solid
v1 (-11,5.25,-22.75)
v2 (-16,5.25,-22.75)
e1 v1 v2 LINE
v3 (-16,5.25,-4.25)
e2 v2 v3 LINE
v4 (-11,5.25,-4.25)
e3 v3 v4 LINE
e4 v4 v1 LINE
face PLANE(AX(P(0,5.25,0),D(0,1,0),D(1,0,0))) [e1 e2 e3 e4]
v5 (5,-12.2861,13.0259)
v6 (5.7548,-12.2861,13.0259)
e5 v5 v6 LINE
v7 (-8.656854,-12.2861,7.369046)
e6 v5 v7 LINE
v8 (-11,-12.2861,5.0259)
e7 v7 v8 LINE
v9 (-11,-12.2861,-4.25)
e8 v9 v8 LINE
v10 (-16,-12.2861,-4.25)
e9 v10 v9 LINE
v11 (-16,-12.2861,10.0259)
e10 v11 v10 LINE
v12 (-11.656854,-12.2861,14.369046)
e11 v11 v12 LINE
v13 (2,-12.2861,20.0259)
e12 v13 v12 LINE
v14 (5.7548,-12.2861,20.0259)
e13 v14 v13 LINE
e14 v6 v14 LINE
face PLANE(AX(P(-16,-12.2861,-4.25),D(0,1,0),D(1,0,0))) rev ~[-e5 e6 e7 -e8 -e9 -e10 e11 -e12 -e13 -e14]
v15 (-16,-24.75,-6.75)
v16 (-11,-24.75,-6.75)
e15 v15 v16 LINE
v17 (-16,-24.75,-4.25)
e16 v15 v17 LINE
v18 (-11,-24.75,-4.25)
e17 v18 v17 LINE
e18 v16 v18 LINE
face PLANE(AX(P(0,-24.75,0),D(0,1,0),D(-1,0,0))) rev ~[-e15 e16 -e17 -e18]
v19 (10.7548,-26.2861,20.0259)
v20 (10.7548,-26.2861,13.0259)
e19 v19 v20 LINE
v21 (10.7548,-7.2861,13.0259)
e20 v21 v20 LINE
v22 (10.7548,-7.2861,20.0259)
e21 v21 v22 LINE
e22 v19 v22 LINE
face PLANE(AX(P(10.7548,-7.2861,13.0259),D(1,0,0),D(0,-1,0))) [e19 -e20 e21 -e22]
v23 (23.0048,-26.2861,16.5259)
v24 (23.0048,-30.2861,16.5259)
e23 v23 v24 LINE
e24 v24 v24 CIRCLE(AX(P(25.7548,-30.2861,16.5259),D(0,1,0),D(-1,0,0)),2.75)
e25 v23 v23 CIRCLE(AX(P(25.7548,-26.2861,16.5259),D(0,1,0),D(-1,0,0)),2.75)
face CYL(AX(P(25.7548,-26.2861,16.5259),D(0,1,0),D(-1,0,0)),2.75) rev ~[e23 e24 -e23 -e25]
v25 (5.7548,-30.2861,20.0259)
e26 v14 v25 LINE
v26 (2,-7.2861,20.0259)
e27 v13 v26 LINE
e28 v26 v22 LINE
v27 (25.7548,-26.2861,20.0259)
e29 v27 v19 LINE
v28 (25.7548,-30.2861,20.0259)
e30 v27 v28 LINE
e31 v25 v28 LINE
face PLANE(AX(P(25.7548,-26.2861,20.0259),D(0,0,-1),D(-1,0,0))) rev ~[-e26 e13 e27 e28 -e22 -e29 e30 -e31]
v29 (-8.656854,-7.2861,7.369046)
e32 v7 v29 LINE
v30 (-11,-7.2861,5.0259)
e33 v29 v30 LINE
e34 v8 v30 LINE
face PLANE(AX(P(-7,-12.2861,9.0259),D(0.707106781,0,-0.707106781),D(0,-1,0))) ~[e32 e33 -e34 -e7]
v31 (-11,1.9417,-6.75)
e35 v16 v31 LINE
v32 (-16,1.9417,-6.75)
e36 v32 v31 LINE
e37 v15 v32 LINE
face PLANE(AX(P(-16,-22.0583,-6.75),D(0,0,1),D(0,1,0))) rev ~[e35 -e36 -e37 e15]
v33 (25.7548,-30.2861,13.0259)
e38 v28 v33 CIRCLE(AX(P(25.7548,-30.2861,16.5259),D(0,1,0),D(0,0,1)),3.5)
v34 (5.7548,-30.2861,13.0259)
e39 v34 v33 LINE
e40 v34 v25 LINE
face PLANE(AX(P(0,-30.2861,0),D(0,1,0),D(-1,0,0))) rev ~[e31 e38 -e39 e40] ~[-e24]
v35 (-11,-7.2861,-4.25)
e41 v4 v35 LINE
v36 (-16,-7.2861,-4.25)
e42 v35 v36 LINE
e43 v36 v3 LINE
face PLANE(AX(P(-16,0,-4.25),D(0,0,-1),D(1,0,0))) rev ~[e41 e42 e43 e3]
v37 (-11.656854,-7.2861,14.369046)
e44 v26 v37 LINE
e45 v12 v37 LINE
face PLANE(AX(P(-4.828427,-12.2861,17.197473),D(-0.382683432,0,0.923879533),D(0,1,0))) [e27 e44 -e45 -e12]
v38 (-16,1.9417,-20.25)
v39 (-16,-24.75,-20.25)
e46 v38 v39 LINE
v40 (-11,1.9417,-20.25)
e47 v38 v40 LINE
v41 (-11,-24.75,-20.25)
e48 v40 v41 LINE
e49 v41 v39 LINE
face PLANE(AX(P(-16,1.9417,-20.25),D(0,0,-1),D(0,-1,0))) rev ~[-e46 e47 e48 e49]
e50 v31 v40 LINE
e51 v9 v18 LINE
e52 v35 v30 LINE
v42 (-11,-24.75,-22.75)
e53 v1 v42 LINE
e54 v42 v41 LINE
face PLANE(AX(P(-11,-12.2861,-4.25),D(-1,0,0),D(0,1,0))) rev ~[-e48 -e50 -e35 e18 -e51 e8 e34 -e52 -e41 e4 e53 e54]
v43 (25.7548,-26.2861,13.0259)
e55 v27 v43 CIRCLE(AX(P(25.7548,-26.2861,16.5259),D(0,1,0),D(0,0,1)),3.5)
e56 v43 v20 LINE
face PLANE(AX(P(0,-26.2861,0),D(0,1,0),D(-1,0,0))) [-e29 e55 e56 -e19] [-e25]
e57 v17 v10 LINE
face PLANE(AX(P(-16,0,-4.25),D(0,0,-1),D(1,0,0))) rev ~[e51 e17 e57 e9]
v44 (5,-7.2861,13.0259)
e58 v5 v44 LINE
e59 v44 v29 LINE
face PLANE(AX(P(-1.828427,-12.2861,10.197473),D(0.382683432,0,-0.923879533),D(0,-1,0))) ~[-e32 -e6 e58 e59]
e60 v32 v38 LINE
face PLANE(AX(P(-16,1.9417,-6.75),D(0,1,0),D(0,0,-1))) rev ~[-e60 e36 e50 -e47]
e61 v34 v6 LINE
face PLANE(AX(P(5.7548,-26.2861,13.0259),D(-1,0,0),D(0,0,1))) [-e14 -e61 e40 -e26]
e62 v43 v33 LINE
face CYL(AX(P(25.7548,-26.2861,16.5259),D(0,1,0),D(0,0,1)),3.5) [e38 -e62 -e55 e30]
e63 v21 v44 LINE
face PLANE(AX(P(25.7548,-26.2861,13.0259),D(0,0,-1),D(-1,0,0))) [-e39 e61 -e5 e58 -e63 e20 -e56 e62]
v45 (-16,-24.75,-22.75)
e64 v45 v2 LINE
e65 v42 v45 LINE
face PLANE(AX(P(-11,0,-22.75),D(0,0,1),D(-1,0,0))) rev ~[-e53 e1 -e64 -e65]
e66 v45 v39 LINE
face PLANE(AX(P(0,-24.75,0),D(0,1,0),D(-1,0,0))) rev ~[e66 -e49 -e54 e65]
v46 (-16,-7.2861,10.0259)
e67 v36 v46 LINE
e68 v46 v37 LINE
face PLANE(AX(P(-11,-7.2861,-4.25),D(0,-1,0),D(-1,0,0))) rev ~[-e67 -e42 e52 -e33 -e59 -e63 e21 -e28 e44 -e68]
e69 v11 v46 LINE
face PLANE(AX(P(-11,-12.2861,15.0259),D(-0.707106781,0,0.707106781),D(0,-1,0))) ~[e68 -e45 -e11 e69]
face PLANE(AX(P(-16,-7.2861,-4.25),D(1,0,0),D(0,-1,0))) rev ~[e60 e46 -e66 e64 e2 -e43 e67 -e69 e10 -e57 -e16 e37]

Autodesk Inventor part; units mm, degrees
ref_plane "YZ Plane" through (0, 0, 0) normal (1, 0, 0) x (0, 1, 0)
ref_plane "XZ Plane" through (0, 0, 0) normal (0, 1, 0) x (-1, 0, 0)
ref_plane "Work Plane7" through (19.7548, -26.2861, 10.5259) normal (0, -1, 0) x (1, 0, 0)
sketch "Sketch10" plane through (0, 0, 0) normal (0, 1, 0) x (-1, 0, 0)
  line L0 (-27.0112, 18.5709) -> (-26.4391, 18.8263) projected
  line L1 (-25.8204, 18.925) -> (-26.4391, 18.8263) projected
  line L2 (-25.1972, 18.8603) -> (-25.8204, 18.925) projected
  line L3 (-24.6121, 18.6364) -> (-25.1972, 18.8603) projected
  line L4 (-24.1048, 18.2687) -> (-24.6121, 18.6364) projected
  line L5 (-23.7099, 17.7823) -> (-24.1048, 18.2687) projected
  line L6 (-23.4545, 17.2102) -> (-23.7099, 17.7823) projected
  line L7 (-23.4545, 17.2102) -> (-23.3557, 16.5915) projected
  line L8 (-23.4205, 15.9683) -> (-23.3557, 16.5915) projected
  line L9 (-23.4205, 15.9683) -> (-23.6444, 15.3832) projected
  line L10 (-23.6444, 15.3832) -> (-24.0121, 14.8759) projected
  line L11 (-24.0121, 14.8759) -> (-24.4985, 14.481) projected
  line L12 (-24.4985, 14.481) -> (-25.0706, 14.2256) projected
  line L13 (-25.0706, 14.2256) -> (-25.6893, 14.1268) projected
  line L14 (-25.6893, 14.1268) -> (-26.3125, 14.1916) projected
  line L15 (-26.3125, 14.1916) -> (-26.8976, 14.4155) projected
  line L16 (-26.8976, 14.4155) -> (-27.4049, 14.7832) projected
  line L17 (-27.4049, 14.7832) -> (-27.7998, 15.2696) projected
  line L18 (-28.0552, 15.8417) -> (-27.7998, 15.2696) projected
  line L19 (-28.0552, 15.8417) -> (-28.1539, 16.4604) projected
  line L20 (-28.1539, 16.4604) -> (-28.0892, 17.0836) projected
  line L21 (-28.0892, 17.0836) -> (-27.8653, 17.6687) projected
  line L22 (-27.8653, 17.6687) -> (-27.4976, 18.176) projected
  line L23 (-27.0112, 18.5709) -> (-27.4976, 18.176) projected
  line L24 (-26.7545, 16.4986) -> (-26.7275, 16.7583) projected
  line L25 (-26.7133, 16.2408) -> (-26.7545, 16.4986) projected
  line L26 (-26.6069, 16.0025) -> (-26.7133, 16.2408) projected
  line L27 (-26.4424, 15.7998) -> (-26.6069, 16.0025) projected
  line L28 (-26.231, 15.6466) -> (-26.4424, 15.7998) projected
  line L29 (-25.9872, 15.5533) -> (-26.231, 15.6466) projected
  line L30 (-25.7275, 15.5263) -> (-25.9872, 15.5533) projected
  line L31 (-25.4697, 15.5675) -> (-25.7275, 15.5263) projected
  line L32 (-25.2314, 15.6739) -> (-25.4697, 15.5675) projected
  line L33 (-25.0287, 15.8384) -> (-25.2314, 15.6739) projected
  line L34 (-24.8755, 16.0498) -> (-25.0287, 15.8384) projected
  line L35 (-24.7822, 16.2936) -> (-24.8755, 16.0498) projected
  line L36 (-24.7552, 16.5533) -> (-24.7822, 16.2936) projected
  line L37 (-24.7552, 16.5533) -> (-24.7963, 16.8111) projected
  line L38 (-24.7963, 16.8111) -> (-24.9028, 17.0494) projected
  line L39 (-24.9028, 17.0494) -> (-25.0673, 17.2521) projected
  line L40 (-25.0673, 17.2521) -> (-25.2787, 17.4053) projected
  line L41 (-25.2787, 17.4053) -> (-25.5225, 17.4986) projected
  line L42 (-25.5225, 17.4986) -> (-25.7822, 17.5256) projected
  line L43 (-25.7822, 17.5256) -> (-26.04, 17.4844) projected
  line L44 (-26.04, 17.4844) -> (-26.2783, 17.378) projected
  line L45 (-26.2783, 17.378) -> (-26.481, 17.2135) projected
  line L46 (-26.481, 17.2135) -> (-26.6342, 17.0021) projected
  line L47 (-26.6342, 17.0021) -> (-26.7275, 16.7583) projected
  line L48 (-27.0112, 18.5709) -> (-26.4391, 18.8263) projected
  line L49 (-25.8204, 18.925) -> (-26.4391, 18.8263) projected
  line L50 (-25.1972, 18.8603) -> (-25.8204, 18.925) projected
  line L51 (-24.6121, 18.6364) -> (-25.1972, 18.8603) projected
  line L52 (-24.1048, 18.2687) -> (-24.6121, 18.6364) projected
  line L53 (-23.7099, 17.7823) -> (-24.1048, 18.2687) projected
  line L54 (-23.4545, 17.2102) -> (-23.7099, 17.7823) projected
  line L55 (-23.4545, 17.2102) -> (-23.3557, 16.5915) projected
  line L56 (-23.4205, 15.9683) -> (-23.3557, 16.5915) projected
  line L57 (-23.4205, 15.9683) -> (-23.6444, 15.3832) projected
  line L58 (-23.6444, 15.3832) -> (-24.0121, 14.8759) projected
  line L59 (-24.0121, 14.8759) -> (-24.4985, 14.481) projected
  line L60 (-24.4985, 14.481) -> (-25.0706, 14.2256) projected
  line L61 (-25.0706, 14.2256) -> (-25.6893, 14.1268) projected
  line L62 (-25.6893, 14.1268) -> (-26.3125, 14.1916) projected
  line L63 (-26.3125, 14.1916) -> (-26.8976, 14.4155) projected
  line L64 (-26.8976, 14.4155) -> (-27.4049, 14.7832) projected
  line L65 (-27.4049, 14.7832) -> (-27.7998, 15.2696) projected
  line L66 (-28.0552, 15.8417) -> (-27.7998, 15.2696) projected
  line L67 (-28.0552, 15.8417) -> (-28.1539, 16.4604) projected
  line L68 (-28.1539, 16.4604) -> (-28.0892, 17.0836) projected
  line L69 (-28.0892, 17.0836) -> (-27.8653, 17.6687) projected
  line L70 (-27.8653, 17.6687) -> (-27.4976, 18.176) projected
  line L71 (-27.0112, 18.5709) -> (-27.4976, 18.176) projected
  line L72 (-26.7545, 16.4986) -> (-26.7275, 16.7583) projected
  line L73 (-26.7133, 16.2408) -> (-26.7545, 16.4986) projected
  line L74 (-26.6069, 16.0025) -> (-26.7133, 16.2408) projected
  line L75 (-26.4424, 15.7998) -> (-26.6069, 16.0025) projected
  line L76 (-26.231, 15.6466) -> (-26.4424, 15.7998) projected
  line L77 (-25.9872, 15.5533) -> (-26.231, 15.6466) projected
  line L78 (-25.7275, 15.5263) -> (-25.9872, 15.5533) projected
  line L79 (-25.4697, 15.5675) -> (-25.7275, 15.5263) projected
  line L80 (-25.2314, 15.6739) -> (-25.4697, 15.5675) projected
  line L81 (-25.0287, 15.8384) -> (-25.2314, 15.6739) projected
  line L82 (-24.8755, 16.0498) -> (-25.0287, 15.8384) projected
  line L83 (-24.7822, 16.2936) -> (-24.8755, 16.0498) projected
  line L84 (-24.7552, 16.5533) -> (-24.7822, 16.2936) projected
  line L85 (-24.7552, 16.5533) -> (-24.7963, 16.8111) projected
  line L86 (-24.7963, 16.8111) -> (-24.9028, 17.0494) projected
  line L87 (-24.9028, 17.0494) -> (-25.0673, 17.2521) projected
  line L88 (-25.0673, 17.2521) -> (-25.2787, 17.4053) projected
  line L89 (-25.2787, 17.4053) -> (-25.5225, 17.4986) projected
  line L90 (-25.5225, 17.4986) -> (-25.7822, 17.5256) projected
  line L91 (-25.7822, 17.5256) -> (-26.04, 17.4844) projected
  line L92 (-26.04, 17.4844) -> (-26.2783, 17.378) projected
  line L93 (-26.2783, 17.378) -> (-26.481, 17.2135) projected
  line L94 (-26.481, 17.2135) -> (-26.6342, 17.0021) projected
  line L95 (-26.6342, 17.0021) -> (-26.7275, 16.7583) projected
  circle A0 centre (-25.7548, 16.5259) radius 2.75
  arc A1 (-25.7548, 20.0259) -> (-25.7548, 13.0259) centre (-25.7548, 16.5259) ccw
  line L96 (-25.7548, 20.0259) -> (-5.7548, 20.0259) construction
  line L97 (-25.7548, 13.0259) -> (-5.7548, 13.0259)
  line L98 (-5.7548, 13.0259) -> (-5.7548, 20.0259)
  line L99 (-25.7548, 20.0259) -> (-5.7548, 20.0259)
  point P0 (0, 0)
  dimension "d36" = 5.5
  dimension "d37" = 7
  dimension "d40" = 20
extrude "Extrusion8" add sketch "Sketch10" against normal blind 4 from surface at -26.2861 contours L99 L98 L97 A1
sketch "Sketch12" plane through (0, 0, 0) normal (0, 1, 0) x (-1, 0, 0)
  line L0 (26.2, -19.75) -> (26.2, -7.25) projected
  line L1 (26.2, -19.75) -> (11, -19.75) projected
  line L2 (11, -7.25) -> (11, -19.75) projected
  line L3 (11, -7.25) -> (26.2, -7.25) projected
  line L4 (22.4706, -11.917) -> (22.6, -11.9) projected
  line L5 (22.35, -11.967) -> (22.4706, -11.917) projected
  line L6 (22.2464, -12.0464) -> (22.35, -11.967) projected
  line L7 (22.167, -12.15) -> (22.2464, -12.0464) projected
  line L8 (22.117, -12.2706) -> (22.167, -12.15) projected
  line L9 (22.1, -12.4) -> (22.117, -12.2706) projected
  line L10 (22.117, -12.5294) -> (22.1, -12.4) projected
  line L11 (22.167, -12.65) -> (22.117, -12.5294) projected
  line L12 (22.2464, -12.7536) -> (22.167, -12.65) projected
  line L13 (22.35, -12.833) -> (22.2464, -12.7536) projected
  line L14 (22.35, -12.833) -> (22.4706, -12.883) projected
  line L15 (22.4706, -12.883) -> (22.6, -12.9) projected
  line L16 (22.6, -12.9) -> (22.7294, -12.883) projected
  line L17 (22.85, -12.833) -> (22.7294, -12.883) projected
  line L18 (22.9536, -12.7536) -> (22.85, -12.833) projected
  line L19 (23.033, -12.65) -> (22.9536, -12.7536) projected
  line L20 (23.033, -12.65) -> (23.083, -12.5294) projected
  line L21 (23.083, -12.5294) -> (23.1, -12.4) projected
  line L22 (23.1, -12.4) -> (23.083, -12.2706) projected
  line L23 (23.083, -12.2706) -> (23.033, -12.15) projected
  line L24 (23.033, -12.15) -> (22.9536, -12.0464) projected
  line L25 (22.9536, -12.0464) -> (22.85, -11.967) projected
  line L26 (22.85, -11.967) -> (22.7294, -11.917) projected
  line L27 (22.6, -11.9) -> (22.7294, -11.917) projected
  line L28 (22.4706, -13.017) -> (22.6, -13) projected
  line L29 (22.35, -13.067) -> (22.4706, -13.017) projected
  line L30 (22.2464, -13.1464) -> (22.35, -13.067) projected
  line L31 (22.167, -13.25) -> (22.2464, -13.1464) projected
  line L32 (22.117, -13.3706) -> (22.167, -13.25) projected
  line L33 (22.1, -13.5) -> (22.117, -13.3706) projected
  line L34 (22.117, -13.6294) -> (22.1, -13.5) projected
  line L35 (22.167, -13.75) -> (22.117, -13.6294) projected
  line L36 (22.2464, -13.8536) -> (22.167, -13.75) projected
  line L37 (22.35, -13.933) -> (22.2464, -13.8536) projected
  line L38 (22.35, -13.933) -> (22.4706, -13.983) projected
  line L39 (22.4706, -13.983) -> (22.6, -14) projected
  line L40 (22.6, -14) -> (22.7294, -13.983) projected
  line L41 (22.85, -13.933) -> (22.7294, -13.983) projected
  line L42 (22.9536, -13.8536) -> (22.85, -13.933) projected
  line L43 (23.033, -13.75) -> (22.9536, -13.8536) projected
  line L44 (23.033, -13.75) -> (23.083, -13.6294) projected
  line L45 (23.083, -13.6294) -> (23.1, -13.5) projected
  line L46 (23.1, -13.5) -> (23.083, -13.3706) projected
  line L47 (23.083, -13.3706) -> (23.033, -13.25) projected
  line L48 (23.033, -13.25) -> (22.9536, -13.1464) projected
  line L49 (22.9536, -13.1464) -> (22.85, -13.067) projected
  line L50 (22.85, -13.067) -> (22.7294, -13.017) projected
  line L51 (22.6, -13) -> (22.7294, -13.017) projected
  line L52 (22.4706, -14.117) -> (22.6, -14.1) projected
  line L53 (22.35, -14.167) -> (22.4706, -14.117) projected
  line L54 (22.2464, -14.2464) -> (22.35, -14.167) projected
  line L55 (22.167, -14.35) -> (22.2464, -14.2464) projected
  line L56 (22.117, -14.4706) -> (22.167, -14.35) projected
  line L57 (22.1, -14.6) -> (22.117, -14.4706) projected
  line L58 (22.117, -14.7294) -> (22.1, -14.6) projected
  line L59 (22.167, -14.85) -> (22.117, -14.7294) projected
  line L60 (22.2464, -14.9536) -> (22.167, -14.85) projected
  line L61 (22.35, -15.033) -> (22.2464, -14.9536) projected
  line L62 (22.35, -15.033) -> (22.4706, -15.083) projected
  line L63 (22.4706, -15.083) -> (22.6, -15.1) projected
  line L64 (22.6, -15.1) -> (22.7294, -15.083) projected
  line L65 (22.85, -15.033) -> (22.7294, -15.083) projected
  line L66 (22.9536, -14.9536) -> (22.85, -15.033) projected
  line L67 (23.033, -14.85) -> (22.9536, -14.9536) projected
  line L68 (23.033, -14.85) -> (23.083, -14.7294) projected
  line L69 (23.083, -14.7294) -> (23.1, -14.6) projected
  line L70 (23.1, -14.6) -> (23.083, -14.4706) projected
  line L71 (23.083, -14.4706) -> (23.033, -14.35) projected
  line L72 (23.033, -14.35) -> (22.9536, -14.2464) projected
  line L73 (22.9536, -14.2464) -> (22.85, -14.167) projected
  line L74 (22.85, -14.167) -> (22.7294, -14.117) projected
  line L75 (22.6, -14.1) -> (22.7294, -14.117) projected
  line L76 (8.5, -12.9) -> (11, -12.9) projected
  line L77 (8.5, -7.25) -> (8.5, -12.9) projected
  line L78 (8.5, -7.25) -> (11, -7.25) projected
  line L79 (11, -12.9) -> (11, -7.25) projected
  line L80 (8.5, -19.75) -> (11, -19.75) projected
  line L81 (8.5, -14.1) -> (8.5, -19.75) projected
  line L82 (8.5, -14.1) -> (11, -14.1) projected
  line L83 (11, -19.75) -> (11, -14.1) projected
  line L84 (11, -7.25) -> (16, -7.25)
  line L85 (16, -7.25) -> (16, -19.75)
  line L86 (16, -19.75) -> (11, -19.75)
  line L87 (11, -19.75) -> (11, -7.25)
  line L88 (16, -7.25) -> (11, -7.25)
  line L89 (11, -7.25) -> (11, -4.25)
  line L90 (11, -4.25) -> (16, -4.25)
  line L91 (16, -4.25) -> (16, -7.25)
  line L92 (16, -19.75) -> (11, -19.75)
  line L93 (11, -19.75) -> (11, -22.75)
  line L94 (11, -22.75) -> (16, -22.75)
  line L95 (16, -22.75) -> (16, -19.75)
  point P0 (0, 0)
  dimension "d41" = 5
  dimension "d42" = 3
  dimension "d43" = 3
extrude "Extrusion10" add sketch "Sketch12" against normal blind 24.75 contours L95 L94 L93 L1 | L1 L2 L3 L85 | L3 L89 L90 L91
sketch "Sketch13" plane through (0, 0, 0) normal (0, 1, 0) x (1, 0, 0)
  line L0 (-16, 22.75) -> (-16, 4.25) projected
  line L1 (-16, 4.25) -> (-11, 4.25) projected
  line L2 (-11, 4.25) -> (-11, 22.75) projected
  line L3 (-11, 22.75) -> (-16, 22.75) projected
  point P0 (0, 0)
extrude "Extrusion11" add sketch "Sketch13" along normal blind 5.25
sketch "Sketch14" plane through (-16, -24.75, -4.25) normal (0, 0, 1) x (1, 0, 0)
  line L0 (0, 0) -> (0, 30) projected
  line L1 (5, 0) -> (0, 0) projected
  line L2 (5, 0) -> (5, 30) projected
  line L3 (0, 30) -> (5, 30) projected
  line L4 (21.7548, -5.5361) -> (41.7548, -5.5361) projected
  line L5 (41.7548, -1.5361) -> (41.7548, -5.5361) projected
  line L6 (21.7548, -1.5361) -> (41.7548, -1.5361) projected
  line L7 (21.7548, -5.5361) -> (21.7548, -1.5361) projected
  line L8 (21.7548, -5.5361) -> (26.7548, -5.5361)
  line L9 (26.7548, -5.5361) -> (26.7548, 12.4639)
  line L10 (26.7548, 12.4639) -> (21.7548, 12.4639)
  line L11 (21.7548, 12.4639) -> (21.7548, -5.5361)
  line L12 (0, 0) -> (0, 30) projected
  line L13 (26.7548, 12.4639) -> (0, 12.4639)
  line L14 (0, 12.4639) -> (0, 17.4639)
  line L15 (0, 17.4639) -> (26.7548, 17.4639)
  line L16 (26.7548, 17.4639) -> (26.7548, 12.4639)
  point P0 (16, 24.75)
  dimension "d48" = 5
  dimension "d49" = 18
  dimension "d50" = 5
extrude "Extrusion12" add sketch "Sketch14" along normal up to surface (7 mm away) from surface at 17.2759 contours L0 L15 L2 L13 | L2 L15 L16 L10 L13 | L10 L9 L6 L11 | L6 L9 L4 L7
sketch "Sketch15" plane through (-16, -24.75, -4.25) normal (0, 0, 1) x (1, 0, 0)
  line L0 (41.7548, -1.5361) -> (26.7548, -1.5361) projected
  line L1 (41.7548, -5.5361) -> (41.7548, -1.5361) projected
  line L2 (41.7548, -5.5361) -> (21.7548, -5.5361) projected
  line L3 (21.7548, 12.4639) -> (21.7548, -5.5361) projected
  line L4 (0, 12.4639) -> (21.7548, 12.4639) projected
  line L5 (0, 17.4639) -> (0, 12.4639) projected
  line L6 (26.7548, 17.4639) -> (0, 17.4639) projected
  line L7 (26.7548, -1.5361) -> (26.7548, 17.4639) projected
  line L8 (0, 0) -> (0, 30) projected
  line L9 (5, 0) -> (0, 0) projected
  line L10 (5, 0) -> (5, 30) projected
  line L11 (0, 30) -> (5, 30) projected
  line L12 (0, 17.4639) -> (5, 17.4639)
  line L13 (5, 17.4639) -> (5, 12.4639)
  line L14 (5, 12.4639) -> (0, 12.4639)
  line L15 (0, 12.4639) -> (0, 17.4639)
  point P0 (16, 24.75)
  point P1 (2.919, 35.6962)
extrude "Extrusion13" add sketch "Sketch15" along normal up to surface (17.2759 mm away) contours L10 L4 L5 L6
sketch "Sketch16" plane through (-16, -24.75, -22.75) normal (-1, 0, 0) x (0, 0, 1)
  line L0 (3, 3.4417) -> (15.5, 3.4417) projected
  line L1 (15.5, 3.4417) -> (15.5, 25.9417) projected
  line L2 (15.5, 25.9417) -> (3, 25.9417) projected
  line L3 (3, 3.4417) -> (3, 25.9417) projected
  line L4 (3, 25.9417) -> (15.5, 3.4417)
  line L5 (2.5, 2.6917) -> (16, 2.6917)
  line L6 (16, 2.6917) -> (16, 26.6917)
  line L7 (16, 26.6917) -> (2.5, 26.6917)
  line L8 (2.5, 26.6917) -> (2.5, 2.6917)
  line L9 (2.5, 2.6917) -> (16, 26.6917) construction
  line L10 (16, 2.6917) -> (2.5, 26.6917) construction
  line L11 (2.5, 2.6917) -> (16, 2.6917)
  line L12 (16, 2.6917) -> (16, -0.068)
  line L13 (16, -0.068) -> (2.5, -0.068)
  line L14 (2.5, -0.068) -> (2.5, 2.6917)
  point P0 (22.75, 24.75)
  point P1 (9.25, 14.6917)
  dimension "d55" = 13.5
  dimension "d56" = 24
extrude "Extrusion14" cut sketch "Sketch16" against normal up to surface (5 mm away) contours L3 L4 L0 | L4 L2 L1 | L8 L7 L6 L5 | L5 L12 L13 L14
chamfer "Chamfer1" distance 10 angle 45 1 edges at (-16, -9.7861, 20.0259)
chamfer "Chamfer2" distance 8 angle 45 1 edges at (-11, -9.7861, 13.0259)
chamfer "Chamfer3" distance 8 angle 45 1 edges at (-6, -9.7861, 20.0259)
chamfer "Chamfer4" distance 8 angle 45 1 edges at (-3, -9.7861, 13.0259)
properties part number "armv3"
